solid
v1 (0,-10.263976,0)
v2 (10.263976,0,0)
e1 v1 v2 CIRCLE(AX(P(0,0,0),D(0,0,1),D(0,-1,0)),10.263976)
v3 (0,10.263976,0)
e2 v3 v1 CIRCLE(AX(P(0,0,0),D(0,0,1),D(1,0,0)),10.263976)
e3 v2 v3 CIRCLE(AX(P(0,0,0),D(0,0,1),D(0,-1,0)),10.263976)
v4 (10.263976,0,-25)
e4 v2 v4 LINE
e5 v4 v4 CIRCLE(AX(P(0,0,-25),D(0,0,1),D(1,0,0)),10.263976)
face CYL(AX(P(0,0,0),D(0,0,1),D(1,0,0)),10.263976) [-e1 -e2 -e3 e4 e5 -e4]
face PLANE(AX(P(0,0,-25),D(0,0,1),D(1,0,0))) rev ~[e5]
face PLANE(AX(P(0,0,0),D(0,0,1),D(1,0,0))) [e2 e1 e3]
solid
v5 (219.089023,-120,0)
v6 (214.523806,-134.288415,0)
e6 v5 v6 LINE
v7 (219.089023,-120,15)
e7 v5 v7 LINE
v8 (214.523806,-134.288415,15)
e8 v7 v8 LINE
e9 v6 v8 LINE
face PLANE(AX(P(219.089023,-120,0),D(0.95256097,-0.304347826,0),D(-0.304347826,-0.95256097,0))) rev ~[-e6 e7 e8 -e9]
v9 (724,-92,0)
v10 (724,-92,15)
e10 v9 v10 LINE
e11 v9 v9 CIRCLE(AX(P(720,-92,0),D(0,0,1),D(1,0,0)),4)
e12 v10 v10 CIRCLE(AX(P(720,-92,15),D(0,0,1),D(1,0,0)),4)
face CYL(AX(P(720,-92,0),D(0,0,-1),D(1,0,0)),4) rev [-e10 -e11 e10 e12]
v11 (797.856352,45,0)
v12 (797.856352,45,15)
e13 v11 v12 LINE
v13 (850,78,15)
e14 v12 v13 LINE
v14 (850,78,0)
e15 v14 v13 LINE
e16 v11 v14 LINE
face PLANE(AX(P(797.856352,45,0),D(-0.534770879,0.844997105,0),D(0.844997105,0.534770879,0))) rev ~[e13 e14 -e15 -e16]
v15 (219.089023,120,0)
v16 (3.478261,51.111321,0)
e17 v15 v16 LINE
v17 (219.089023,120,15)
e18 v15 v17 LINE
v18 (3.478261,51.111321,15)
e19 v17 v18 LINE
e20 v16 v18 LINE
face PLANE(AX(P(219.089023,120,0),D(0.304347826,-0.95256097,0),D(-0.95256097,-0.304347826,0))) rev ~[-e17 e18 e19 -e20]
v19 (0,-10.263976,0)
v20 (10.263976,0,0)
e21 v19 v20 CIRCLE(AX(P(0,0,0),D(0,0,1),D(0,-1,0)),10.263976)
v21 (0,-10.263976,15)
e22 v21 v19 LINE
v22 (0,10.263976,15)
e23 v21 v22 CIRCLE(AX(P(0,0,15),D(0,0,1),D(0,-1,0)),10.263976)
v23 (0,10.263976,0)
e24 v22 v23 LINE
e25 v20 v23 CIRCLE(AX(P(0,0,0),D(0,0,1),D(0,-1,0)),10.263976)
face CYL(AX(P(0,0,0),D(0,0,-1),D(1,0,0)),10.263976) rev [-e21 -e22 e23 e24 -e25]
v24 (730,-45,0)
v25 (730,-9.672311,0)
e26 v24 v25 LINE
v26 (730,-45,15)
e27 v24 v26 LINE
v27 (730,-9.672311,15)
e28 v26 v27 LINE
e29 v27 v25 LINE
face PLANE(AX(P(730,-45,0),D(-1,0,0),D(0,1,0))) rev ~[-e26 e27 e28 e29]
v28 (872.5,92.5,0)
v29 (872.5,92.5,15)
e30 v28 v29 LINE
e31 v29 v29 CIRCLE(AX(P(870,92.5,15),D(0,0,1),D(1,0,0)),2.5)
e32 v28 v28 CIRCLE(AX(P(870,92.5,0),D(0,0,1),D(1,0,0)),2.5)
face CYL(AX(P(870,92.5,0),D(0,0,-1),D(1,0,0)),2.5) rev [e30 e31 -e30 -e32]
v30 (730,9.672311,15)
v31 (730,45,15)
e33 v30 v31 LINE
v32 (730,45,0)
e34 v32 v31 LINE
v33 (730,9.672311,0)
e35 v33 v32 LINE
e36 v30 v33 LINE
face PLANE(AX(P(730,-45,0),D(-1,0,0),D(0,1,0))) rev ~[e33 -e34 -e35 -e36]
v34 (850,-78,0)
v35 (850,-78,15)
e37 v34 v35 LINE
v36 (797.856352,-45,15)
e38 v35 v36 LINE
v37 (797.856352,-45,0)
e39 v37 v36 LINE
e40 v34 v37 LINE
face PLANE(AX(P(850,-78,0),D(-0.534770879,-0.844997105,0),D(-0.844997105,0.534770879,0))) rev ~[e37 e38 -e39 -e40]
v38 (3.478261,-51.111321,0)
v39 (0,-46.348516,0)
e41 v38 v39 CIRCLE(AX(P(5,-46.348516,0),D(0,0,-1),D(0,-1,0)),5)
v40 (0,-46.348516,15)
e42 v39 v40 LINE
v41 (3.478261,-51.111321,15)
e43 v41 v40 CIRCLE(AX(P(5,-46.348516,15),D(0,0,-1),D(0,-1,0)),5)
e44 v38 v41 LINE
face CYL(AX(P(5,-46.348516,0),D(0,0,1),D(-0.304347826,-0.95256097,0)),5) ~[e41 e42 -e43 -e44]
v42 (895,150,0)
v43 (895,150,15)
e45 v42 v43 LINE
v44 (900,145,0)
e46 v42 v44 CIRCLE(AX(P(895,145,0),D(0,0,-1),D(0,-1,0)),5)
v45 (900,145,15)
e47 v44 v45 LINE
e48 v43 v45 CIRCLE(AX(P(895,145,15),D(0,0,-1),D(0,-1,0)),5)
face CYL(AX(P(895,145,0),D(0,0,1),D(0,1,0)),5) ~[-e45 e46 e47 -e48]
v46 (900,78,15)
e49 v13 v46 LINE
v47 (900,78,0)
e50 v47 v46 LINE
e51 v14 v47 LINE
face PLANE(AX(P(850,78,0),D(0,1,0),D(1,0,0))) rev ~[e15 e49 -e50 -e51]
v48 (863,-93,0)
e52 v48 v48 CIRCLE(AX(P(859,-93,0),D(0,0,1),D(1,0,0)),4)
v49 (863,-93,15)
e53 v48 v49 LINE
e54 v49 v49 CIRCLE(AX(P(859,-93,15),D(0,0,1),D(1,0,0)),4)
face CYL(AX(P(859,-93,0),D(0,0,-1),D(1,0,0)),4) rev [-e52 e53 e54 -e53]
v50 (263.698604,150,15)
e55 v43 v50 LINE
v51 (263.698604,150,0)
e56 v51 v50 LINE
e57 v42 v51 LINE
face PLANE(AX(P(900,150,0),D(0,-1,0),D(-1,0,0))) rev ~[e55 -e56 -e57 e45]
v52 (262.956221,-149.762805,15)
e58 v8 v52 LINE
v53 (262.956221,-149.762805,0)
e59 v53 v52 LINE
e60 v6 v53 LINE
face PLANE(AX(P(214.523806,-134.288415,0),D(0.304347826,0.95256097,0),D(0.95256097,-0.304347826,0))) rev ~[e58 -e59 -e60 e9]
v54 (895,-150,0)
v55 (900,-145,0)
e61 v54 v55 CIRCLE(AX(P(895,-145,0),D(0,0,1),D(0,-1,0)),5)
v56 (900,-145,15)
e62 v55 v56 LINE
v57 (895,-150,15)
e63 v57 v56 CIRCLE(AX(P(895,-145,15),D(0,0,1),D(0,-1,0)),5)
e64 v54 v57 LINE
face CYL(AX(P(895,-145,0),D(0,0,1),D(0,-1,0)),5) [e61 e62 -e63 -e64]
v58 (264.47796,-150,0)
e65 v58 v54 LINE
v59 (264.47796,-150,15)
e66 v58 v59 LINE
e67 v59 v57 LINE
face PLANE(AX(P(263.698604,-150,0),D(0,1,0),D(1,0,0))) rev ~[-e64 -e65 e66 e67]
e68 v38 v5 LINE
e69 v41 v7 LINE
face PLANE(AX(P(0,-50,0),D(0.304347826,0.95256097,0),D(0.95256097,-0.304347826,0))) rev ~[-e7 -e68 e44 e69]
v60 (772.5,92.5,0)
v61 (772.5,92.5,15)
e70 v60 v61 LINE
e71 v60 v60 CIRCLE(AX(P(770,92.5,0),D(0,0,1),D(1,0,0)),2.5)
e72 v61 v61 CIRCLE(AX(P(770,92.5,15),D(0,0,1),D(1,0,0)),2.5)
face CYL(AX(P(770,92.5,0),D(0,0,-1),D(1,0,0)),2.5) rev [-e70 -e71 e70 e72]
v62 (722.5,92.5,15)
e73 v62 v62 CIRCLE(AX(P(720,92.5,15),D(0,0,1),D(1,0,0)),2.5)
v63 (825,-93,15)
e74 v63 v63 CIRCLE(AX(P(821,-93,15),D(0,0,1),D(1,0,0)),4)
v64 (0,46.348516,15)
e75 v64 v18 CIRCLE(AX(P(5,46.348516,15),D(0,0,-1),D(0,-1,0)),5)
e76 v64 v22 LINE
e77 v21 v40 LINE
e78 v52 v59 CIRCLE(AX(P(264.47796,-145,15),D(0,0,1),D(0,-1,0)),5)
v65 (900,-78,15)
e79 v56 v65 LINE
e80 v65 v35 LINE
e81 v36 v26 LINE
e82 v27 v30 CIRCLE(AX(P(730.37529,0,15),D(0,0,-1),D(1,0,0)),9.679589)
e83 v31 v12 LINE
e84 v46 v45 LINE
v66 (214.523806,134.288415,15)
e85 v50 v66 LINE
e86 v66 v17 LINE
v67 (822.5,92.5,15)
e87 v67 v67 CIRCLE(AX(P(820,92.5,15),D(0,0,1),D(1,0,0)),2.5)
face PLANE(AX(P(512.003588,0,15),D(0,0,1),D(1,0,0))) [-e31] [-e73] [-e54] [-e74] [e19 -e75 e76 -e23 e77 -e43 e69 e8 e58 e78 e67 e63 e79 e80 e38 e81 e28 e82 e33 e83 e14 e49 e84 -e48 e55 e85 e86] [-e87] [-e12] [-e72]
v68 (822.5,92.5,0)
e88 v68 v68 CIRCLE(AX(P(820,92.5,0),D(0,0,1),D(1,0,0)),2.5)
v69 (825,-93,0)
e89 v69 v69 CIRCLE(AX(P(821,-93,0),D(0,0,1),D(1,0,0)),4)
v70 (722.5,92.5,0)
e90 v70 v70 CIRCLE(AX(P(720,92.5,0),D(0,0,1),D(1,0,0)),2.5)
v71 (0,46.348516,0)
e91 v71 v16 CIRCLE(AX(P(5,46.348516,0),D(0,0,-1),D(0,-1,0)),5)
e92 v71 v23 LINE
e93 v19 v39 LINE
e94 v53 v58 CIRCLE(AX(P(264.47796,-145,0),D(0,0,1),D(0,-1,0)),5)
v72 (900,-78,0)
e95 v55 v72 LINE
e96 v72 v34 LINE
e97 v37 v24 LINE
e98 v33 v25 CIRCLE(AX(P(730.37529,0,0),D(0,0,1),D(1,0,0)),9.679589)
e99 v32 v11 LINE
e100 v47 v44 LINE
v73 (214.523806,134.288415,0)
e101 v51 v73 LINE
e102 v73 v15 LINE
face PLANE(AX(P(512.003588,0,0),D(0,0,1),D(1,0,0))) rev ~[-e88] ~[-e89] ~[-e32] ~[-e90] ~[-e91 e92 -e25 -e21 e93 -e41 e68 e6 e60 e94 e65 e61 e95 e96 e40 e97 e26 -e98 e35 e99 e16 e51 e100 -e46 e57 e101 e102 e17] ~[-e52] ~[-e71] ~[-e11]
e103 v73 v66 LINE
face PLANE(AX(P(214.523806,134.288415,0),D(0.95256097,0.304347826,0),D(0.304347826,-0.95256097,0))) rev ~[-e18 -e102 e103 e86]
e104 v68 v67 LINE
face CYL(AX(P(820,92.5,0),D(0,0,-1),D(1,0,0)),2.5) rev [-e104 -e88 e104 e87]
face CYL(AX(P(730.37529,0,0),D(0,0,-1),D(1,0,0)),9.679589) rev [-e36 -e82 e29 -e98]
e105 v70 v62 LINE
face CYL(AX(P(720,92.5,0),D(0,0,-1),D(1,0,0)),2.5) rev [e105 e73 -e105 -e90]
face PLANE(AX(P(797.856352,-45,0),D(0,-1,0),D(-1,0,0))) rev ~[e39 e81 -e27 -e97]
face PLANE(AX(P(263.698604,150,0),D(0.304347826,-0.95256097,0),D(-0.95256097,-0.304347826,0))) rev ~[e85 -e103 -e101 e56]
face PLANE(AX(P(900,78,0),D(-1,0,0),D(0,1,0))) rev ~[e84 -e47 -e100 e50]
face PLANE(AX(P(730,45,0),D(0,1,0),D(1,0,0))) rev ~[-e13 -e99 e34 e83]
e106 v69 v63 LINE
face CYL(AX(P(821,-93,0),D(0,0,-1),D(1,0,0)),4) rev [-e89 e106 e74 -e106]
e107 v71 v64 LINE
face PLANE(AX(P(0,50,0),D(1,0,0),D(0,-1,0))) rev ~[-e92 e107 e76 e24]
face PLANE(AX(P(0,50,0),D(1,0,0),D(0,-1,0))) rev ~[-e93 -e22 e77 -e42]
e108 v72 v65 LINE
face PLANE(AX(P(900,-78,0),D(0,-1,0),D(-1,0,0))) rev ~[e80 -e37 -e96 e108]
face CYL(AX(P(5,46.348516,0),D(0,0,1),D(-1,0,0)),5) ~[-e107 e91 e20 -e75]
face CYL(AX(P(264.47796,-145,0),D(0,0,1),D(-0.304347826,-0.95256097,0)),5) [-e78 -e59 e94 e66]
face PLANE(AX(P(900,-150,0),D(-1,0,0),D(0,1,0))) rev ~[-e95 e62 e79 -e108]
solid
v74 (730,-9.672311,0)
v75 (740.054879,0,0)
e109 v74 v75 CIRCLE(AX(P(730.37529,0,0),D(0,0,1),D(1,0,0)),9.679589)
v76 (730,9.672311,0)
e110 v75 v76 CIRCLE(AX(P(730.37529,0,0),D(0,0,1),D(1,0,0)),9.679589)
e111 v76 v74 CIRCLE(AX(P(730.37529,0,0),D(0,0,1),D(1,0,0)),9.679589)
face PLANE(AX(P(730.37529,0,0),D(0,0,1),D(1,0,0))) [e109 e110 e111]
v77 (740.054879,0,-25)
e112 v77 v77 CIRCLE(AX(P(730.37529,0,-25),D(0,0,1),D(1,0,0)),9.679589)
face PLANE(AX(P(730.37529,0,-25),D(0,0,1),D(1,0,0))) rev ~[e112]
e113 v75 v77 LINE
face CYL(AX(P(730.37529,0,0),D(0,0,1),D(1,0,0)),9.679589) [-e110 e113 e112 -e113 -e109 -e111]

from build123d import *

# Parameters (mm, degrees)
F0_R     = 4
F0_R_2   = 2.5
F1_DEPTH = 15
F2_R     = 5
F3_R     = 5
F4_R     = 5
F5_R     = 10.2639763847
F5_R_2   = 9.6795888004
F6_DEPTH = 25
F7_DEPTH = 25


# Not quite as in the source:
# - a feature names something its author has since deleted; it is built from what else it names


with BuildPart() as f1:
    # F0 (on Top) → F1 (new body)
    with BuildSketch(Plane.XY):
        Polygon((0, 50), (0, 0), (0, -50), (219.0890230021, -120), (214.5238056108, -134.2884145436), (263.6986042887, -150), (900, -150), (900, -78), (850, -78), (797.8563520055, -45), (785, -45), (730, -45), (730, 45), (785, 45), (797.8563520055, 45), (850, 78), (900, 78), (900, 150), (263.6986042887, 150), (214.5238056108, 134.2884145436), (219.0890230021, 120), align=None)
        with Locations((720, -92)):
            Circle(F0_R, mode=Mode.SUBTRACT)
        with Locations((821, -93)):
            Circle(F0_R, mode=Mode.SUBTRACT)
        with Locations((859, -93)):
            Circle(F0_R, mode=Mode.SUBTRACT)
        with Locations((720, 92.5)):
            Circle(F0_R_2, mode=Mode.SUBTRACT)
        with Locations((770, 92.5)):
            Circle(F0_R_2, mode=Mode.SUBTRACT)
        with Locations((820, 92.5)):
            Circle(F0_R_2, mode=Mode.SUBTRACT)
        with Locations((870, 92.5)):
            Circle(F0_R_2, mode=Mode.SUBTRACT)
    extrude(amount=F1_DEPTH)

    # F2
    f2_edges = [f1.edges().sort_by_distance(p)[0] for p in [
        (263.698604, -150, 7.5),
    ]]
    fillet(f2_edges, radius=F2_R)

    # F3
    f3_edges = [f1.edges().sort_by_distance(p)[0] for p in [
        (0, -50, 7.5),
        (0, 50, 7.5),
    ]]
    fillet(f3_edges, radius=F3_R)

    # F4
    f4_edges = [f1.edges().sort_by_distance(p)[0] for p in [
        (900, 150, 7.5),
        (900, -150, 7.5),
    ]]
    fillet(f4_edges, radius=F4_R)

    # F5 (on Top) → F6 (cut)
    with BuildSketch(Plane.XY):
        Circle(F5_R)
        with Locations((730.375289917, 0)):
            Circle(F5_R_2)
    extrude(amount=F6_DEPTH, mode=Mode.SUBTRACT)

    # F5 (on Top) → F7 (join)
    with BuildSketch(Plane.XY):
        Circle(F5_R)
        with Locations((730.375289917, 0)):
            Circle(F5_R_2)
    extrude(amount=-F7_DEPTH)


solid = f1.part
